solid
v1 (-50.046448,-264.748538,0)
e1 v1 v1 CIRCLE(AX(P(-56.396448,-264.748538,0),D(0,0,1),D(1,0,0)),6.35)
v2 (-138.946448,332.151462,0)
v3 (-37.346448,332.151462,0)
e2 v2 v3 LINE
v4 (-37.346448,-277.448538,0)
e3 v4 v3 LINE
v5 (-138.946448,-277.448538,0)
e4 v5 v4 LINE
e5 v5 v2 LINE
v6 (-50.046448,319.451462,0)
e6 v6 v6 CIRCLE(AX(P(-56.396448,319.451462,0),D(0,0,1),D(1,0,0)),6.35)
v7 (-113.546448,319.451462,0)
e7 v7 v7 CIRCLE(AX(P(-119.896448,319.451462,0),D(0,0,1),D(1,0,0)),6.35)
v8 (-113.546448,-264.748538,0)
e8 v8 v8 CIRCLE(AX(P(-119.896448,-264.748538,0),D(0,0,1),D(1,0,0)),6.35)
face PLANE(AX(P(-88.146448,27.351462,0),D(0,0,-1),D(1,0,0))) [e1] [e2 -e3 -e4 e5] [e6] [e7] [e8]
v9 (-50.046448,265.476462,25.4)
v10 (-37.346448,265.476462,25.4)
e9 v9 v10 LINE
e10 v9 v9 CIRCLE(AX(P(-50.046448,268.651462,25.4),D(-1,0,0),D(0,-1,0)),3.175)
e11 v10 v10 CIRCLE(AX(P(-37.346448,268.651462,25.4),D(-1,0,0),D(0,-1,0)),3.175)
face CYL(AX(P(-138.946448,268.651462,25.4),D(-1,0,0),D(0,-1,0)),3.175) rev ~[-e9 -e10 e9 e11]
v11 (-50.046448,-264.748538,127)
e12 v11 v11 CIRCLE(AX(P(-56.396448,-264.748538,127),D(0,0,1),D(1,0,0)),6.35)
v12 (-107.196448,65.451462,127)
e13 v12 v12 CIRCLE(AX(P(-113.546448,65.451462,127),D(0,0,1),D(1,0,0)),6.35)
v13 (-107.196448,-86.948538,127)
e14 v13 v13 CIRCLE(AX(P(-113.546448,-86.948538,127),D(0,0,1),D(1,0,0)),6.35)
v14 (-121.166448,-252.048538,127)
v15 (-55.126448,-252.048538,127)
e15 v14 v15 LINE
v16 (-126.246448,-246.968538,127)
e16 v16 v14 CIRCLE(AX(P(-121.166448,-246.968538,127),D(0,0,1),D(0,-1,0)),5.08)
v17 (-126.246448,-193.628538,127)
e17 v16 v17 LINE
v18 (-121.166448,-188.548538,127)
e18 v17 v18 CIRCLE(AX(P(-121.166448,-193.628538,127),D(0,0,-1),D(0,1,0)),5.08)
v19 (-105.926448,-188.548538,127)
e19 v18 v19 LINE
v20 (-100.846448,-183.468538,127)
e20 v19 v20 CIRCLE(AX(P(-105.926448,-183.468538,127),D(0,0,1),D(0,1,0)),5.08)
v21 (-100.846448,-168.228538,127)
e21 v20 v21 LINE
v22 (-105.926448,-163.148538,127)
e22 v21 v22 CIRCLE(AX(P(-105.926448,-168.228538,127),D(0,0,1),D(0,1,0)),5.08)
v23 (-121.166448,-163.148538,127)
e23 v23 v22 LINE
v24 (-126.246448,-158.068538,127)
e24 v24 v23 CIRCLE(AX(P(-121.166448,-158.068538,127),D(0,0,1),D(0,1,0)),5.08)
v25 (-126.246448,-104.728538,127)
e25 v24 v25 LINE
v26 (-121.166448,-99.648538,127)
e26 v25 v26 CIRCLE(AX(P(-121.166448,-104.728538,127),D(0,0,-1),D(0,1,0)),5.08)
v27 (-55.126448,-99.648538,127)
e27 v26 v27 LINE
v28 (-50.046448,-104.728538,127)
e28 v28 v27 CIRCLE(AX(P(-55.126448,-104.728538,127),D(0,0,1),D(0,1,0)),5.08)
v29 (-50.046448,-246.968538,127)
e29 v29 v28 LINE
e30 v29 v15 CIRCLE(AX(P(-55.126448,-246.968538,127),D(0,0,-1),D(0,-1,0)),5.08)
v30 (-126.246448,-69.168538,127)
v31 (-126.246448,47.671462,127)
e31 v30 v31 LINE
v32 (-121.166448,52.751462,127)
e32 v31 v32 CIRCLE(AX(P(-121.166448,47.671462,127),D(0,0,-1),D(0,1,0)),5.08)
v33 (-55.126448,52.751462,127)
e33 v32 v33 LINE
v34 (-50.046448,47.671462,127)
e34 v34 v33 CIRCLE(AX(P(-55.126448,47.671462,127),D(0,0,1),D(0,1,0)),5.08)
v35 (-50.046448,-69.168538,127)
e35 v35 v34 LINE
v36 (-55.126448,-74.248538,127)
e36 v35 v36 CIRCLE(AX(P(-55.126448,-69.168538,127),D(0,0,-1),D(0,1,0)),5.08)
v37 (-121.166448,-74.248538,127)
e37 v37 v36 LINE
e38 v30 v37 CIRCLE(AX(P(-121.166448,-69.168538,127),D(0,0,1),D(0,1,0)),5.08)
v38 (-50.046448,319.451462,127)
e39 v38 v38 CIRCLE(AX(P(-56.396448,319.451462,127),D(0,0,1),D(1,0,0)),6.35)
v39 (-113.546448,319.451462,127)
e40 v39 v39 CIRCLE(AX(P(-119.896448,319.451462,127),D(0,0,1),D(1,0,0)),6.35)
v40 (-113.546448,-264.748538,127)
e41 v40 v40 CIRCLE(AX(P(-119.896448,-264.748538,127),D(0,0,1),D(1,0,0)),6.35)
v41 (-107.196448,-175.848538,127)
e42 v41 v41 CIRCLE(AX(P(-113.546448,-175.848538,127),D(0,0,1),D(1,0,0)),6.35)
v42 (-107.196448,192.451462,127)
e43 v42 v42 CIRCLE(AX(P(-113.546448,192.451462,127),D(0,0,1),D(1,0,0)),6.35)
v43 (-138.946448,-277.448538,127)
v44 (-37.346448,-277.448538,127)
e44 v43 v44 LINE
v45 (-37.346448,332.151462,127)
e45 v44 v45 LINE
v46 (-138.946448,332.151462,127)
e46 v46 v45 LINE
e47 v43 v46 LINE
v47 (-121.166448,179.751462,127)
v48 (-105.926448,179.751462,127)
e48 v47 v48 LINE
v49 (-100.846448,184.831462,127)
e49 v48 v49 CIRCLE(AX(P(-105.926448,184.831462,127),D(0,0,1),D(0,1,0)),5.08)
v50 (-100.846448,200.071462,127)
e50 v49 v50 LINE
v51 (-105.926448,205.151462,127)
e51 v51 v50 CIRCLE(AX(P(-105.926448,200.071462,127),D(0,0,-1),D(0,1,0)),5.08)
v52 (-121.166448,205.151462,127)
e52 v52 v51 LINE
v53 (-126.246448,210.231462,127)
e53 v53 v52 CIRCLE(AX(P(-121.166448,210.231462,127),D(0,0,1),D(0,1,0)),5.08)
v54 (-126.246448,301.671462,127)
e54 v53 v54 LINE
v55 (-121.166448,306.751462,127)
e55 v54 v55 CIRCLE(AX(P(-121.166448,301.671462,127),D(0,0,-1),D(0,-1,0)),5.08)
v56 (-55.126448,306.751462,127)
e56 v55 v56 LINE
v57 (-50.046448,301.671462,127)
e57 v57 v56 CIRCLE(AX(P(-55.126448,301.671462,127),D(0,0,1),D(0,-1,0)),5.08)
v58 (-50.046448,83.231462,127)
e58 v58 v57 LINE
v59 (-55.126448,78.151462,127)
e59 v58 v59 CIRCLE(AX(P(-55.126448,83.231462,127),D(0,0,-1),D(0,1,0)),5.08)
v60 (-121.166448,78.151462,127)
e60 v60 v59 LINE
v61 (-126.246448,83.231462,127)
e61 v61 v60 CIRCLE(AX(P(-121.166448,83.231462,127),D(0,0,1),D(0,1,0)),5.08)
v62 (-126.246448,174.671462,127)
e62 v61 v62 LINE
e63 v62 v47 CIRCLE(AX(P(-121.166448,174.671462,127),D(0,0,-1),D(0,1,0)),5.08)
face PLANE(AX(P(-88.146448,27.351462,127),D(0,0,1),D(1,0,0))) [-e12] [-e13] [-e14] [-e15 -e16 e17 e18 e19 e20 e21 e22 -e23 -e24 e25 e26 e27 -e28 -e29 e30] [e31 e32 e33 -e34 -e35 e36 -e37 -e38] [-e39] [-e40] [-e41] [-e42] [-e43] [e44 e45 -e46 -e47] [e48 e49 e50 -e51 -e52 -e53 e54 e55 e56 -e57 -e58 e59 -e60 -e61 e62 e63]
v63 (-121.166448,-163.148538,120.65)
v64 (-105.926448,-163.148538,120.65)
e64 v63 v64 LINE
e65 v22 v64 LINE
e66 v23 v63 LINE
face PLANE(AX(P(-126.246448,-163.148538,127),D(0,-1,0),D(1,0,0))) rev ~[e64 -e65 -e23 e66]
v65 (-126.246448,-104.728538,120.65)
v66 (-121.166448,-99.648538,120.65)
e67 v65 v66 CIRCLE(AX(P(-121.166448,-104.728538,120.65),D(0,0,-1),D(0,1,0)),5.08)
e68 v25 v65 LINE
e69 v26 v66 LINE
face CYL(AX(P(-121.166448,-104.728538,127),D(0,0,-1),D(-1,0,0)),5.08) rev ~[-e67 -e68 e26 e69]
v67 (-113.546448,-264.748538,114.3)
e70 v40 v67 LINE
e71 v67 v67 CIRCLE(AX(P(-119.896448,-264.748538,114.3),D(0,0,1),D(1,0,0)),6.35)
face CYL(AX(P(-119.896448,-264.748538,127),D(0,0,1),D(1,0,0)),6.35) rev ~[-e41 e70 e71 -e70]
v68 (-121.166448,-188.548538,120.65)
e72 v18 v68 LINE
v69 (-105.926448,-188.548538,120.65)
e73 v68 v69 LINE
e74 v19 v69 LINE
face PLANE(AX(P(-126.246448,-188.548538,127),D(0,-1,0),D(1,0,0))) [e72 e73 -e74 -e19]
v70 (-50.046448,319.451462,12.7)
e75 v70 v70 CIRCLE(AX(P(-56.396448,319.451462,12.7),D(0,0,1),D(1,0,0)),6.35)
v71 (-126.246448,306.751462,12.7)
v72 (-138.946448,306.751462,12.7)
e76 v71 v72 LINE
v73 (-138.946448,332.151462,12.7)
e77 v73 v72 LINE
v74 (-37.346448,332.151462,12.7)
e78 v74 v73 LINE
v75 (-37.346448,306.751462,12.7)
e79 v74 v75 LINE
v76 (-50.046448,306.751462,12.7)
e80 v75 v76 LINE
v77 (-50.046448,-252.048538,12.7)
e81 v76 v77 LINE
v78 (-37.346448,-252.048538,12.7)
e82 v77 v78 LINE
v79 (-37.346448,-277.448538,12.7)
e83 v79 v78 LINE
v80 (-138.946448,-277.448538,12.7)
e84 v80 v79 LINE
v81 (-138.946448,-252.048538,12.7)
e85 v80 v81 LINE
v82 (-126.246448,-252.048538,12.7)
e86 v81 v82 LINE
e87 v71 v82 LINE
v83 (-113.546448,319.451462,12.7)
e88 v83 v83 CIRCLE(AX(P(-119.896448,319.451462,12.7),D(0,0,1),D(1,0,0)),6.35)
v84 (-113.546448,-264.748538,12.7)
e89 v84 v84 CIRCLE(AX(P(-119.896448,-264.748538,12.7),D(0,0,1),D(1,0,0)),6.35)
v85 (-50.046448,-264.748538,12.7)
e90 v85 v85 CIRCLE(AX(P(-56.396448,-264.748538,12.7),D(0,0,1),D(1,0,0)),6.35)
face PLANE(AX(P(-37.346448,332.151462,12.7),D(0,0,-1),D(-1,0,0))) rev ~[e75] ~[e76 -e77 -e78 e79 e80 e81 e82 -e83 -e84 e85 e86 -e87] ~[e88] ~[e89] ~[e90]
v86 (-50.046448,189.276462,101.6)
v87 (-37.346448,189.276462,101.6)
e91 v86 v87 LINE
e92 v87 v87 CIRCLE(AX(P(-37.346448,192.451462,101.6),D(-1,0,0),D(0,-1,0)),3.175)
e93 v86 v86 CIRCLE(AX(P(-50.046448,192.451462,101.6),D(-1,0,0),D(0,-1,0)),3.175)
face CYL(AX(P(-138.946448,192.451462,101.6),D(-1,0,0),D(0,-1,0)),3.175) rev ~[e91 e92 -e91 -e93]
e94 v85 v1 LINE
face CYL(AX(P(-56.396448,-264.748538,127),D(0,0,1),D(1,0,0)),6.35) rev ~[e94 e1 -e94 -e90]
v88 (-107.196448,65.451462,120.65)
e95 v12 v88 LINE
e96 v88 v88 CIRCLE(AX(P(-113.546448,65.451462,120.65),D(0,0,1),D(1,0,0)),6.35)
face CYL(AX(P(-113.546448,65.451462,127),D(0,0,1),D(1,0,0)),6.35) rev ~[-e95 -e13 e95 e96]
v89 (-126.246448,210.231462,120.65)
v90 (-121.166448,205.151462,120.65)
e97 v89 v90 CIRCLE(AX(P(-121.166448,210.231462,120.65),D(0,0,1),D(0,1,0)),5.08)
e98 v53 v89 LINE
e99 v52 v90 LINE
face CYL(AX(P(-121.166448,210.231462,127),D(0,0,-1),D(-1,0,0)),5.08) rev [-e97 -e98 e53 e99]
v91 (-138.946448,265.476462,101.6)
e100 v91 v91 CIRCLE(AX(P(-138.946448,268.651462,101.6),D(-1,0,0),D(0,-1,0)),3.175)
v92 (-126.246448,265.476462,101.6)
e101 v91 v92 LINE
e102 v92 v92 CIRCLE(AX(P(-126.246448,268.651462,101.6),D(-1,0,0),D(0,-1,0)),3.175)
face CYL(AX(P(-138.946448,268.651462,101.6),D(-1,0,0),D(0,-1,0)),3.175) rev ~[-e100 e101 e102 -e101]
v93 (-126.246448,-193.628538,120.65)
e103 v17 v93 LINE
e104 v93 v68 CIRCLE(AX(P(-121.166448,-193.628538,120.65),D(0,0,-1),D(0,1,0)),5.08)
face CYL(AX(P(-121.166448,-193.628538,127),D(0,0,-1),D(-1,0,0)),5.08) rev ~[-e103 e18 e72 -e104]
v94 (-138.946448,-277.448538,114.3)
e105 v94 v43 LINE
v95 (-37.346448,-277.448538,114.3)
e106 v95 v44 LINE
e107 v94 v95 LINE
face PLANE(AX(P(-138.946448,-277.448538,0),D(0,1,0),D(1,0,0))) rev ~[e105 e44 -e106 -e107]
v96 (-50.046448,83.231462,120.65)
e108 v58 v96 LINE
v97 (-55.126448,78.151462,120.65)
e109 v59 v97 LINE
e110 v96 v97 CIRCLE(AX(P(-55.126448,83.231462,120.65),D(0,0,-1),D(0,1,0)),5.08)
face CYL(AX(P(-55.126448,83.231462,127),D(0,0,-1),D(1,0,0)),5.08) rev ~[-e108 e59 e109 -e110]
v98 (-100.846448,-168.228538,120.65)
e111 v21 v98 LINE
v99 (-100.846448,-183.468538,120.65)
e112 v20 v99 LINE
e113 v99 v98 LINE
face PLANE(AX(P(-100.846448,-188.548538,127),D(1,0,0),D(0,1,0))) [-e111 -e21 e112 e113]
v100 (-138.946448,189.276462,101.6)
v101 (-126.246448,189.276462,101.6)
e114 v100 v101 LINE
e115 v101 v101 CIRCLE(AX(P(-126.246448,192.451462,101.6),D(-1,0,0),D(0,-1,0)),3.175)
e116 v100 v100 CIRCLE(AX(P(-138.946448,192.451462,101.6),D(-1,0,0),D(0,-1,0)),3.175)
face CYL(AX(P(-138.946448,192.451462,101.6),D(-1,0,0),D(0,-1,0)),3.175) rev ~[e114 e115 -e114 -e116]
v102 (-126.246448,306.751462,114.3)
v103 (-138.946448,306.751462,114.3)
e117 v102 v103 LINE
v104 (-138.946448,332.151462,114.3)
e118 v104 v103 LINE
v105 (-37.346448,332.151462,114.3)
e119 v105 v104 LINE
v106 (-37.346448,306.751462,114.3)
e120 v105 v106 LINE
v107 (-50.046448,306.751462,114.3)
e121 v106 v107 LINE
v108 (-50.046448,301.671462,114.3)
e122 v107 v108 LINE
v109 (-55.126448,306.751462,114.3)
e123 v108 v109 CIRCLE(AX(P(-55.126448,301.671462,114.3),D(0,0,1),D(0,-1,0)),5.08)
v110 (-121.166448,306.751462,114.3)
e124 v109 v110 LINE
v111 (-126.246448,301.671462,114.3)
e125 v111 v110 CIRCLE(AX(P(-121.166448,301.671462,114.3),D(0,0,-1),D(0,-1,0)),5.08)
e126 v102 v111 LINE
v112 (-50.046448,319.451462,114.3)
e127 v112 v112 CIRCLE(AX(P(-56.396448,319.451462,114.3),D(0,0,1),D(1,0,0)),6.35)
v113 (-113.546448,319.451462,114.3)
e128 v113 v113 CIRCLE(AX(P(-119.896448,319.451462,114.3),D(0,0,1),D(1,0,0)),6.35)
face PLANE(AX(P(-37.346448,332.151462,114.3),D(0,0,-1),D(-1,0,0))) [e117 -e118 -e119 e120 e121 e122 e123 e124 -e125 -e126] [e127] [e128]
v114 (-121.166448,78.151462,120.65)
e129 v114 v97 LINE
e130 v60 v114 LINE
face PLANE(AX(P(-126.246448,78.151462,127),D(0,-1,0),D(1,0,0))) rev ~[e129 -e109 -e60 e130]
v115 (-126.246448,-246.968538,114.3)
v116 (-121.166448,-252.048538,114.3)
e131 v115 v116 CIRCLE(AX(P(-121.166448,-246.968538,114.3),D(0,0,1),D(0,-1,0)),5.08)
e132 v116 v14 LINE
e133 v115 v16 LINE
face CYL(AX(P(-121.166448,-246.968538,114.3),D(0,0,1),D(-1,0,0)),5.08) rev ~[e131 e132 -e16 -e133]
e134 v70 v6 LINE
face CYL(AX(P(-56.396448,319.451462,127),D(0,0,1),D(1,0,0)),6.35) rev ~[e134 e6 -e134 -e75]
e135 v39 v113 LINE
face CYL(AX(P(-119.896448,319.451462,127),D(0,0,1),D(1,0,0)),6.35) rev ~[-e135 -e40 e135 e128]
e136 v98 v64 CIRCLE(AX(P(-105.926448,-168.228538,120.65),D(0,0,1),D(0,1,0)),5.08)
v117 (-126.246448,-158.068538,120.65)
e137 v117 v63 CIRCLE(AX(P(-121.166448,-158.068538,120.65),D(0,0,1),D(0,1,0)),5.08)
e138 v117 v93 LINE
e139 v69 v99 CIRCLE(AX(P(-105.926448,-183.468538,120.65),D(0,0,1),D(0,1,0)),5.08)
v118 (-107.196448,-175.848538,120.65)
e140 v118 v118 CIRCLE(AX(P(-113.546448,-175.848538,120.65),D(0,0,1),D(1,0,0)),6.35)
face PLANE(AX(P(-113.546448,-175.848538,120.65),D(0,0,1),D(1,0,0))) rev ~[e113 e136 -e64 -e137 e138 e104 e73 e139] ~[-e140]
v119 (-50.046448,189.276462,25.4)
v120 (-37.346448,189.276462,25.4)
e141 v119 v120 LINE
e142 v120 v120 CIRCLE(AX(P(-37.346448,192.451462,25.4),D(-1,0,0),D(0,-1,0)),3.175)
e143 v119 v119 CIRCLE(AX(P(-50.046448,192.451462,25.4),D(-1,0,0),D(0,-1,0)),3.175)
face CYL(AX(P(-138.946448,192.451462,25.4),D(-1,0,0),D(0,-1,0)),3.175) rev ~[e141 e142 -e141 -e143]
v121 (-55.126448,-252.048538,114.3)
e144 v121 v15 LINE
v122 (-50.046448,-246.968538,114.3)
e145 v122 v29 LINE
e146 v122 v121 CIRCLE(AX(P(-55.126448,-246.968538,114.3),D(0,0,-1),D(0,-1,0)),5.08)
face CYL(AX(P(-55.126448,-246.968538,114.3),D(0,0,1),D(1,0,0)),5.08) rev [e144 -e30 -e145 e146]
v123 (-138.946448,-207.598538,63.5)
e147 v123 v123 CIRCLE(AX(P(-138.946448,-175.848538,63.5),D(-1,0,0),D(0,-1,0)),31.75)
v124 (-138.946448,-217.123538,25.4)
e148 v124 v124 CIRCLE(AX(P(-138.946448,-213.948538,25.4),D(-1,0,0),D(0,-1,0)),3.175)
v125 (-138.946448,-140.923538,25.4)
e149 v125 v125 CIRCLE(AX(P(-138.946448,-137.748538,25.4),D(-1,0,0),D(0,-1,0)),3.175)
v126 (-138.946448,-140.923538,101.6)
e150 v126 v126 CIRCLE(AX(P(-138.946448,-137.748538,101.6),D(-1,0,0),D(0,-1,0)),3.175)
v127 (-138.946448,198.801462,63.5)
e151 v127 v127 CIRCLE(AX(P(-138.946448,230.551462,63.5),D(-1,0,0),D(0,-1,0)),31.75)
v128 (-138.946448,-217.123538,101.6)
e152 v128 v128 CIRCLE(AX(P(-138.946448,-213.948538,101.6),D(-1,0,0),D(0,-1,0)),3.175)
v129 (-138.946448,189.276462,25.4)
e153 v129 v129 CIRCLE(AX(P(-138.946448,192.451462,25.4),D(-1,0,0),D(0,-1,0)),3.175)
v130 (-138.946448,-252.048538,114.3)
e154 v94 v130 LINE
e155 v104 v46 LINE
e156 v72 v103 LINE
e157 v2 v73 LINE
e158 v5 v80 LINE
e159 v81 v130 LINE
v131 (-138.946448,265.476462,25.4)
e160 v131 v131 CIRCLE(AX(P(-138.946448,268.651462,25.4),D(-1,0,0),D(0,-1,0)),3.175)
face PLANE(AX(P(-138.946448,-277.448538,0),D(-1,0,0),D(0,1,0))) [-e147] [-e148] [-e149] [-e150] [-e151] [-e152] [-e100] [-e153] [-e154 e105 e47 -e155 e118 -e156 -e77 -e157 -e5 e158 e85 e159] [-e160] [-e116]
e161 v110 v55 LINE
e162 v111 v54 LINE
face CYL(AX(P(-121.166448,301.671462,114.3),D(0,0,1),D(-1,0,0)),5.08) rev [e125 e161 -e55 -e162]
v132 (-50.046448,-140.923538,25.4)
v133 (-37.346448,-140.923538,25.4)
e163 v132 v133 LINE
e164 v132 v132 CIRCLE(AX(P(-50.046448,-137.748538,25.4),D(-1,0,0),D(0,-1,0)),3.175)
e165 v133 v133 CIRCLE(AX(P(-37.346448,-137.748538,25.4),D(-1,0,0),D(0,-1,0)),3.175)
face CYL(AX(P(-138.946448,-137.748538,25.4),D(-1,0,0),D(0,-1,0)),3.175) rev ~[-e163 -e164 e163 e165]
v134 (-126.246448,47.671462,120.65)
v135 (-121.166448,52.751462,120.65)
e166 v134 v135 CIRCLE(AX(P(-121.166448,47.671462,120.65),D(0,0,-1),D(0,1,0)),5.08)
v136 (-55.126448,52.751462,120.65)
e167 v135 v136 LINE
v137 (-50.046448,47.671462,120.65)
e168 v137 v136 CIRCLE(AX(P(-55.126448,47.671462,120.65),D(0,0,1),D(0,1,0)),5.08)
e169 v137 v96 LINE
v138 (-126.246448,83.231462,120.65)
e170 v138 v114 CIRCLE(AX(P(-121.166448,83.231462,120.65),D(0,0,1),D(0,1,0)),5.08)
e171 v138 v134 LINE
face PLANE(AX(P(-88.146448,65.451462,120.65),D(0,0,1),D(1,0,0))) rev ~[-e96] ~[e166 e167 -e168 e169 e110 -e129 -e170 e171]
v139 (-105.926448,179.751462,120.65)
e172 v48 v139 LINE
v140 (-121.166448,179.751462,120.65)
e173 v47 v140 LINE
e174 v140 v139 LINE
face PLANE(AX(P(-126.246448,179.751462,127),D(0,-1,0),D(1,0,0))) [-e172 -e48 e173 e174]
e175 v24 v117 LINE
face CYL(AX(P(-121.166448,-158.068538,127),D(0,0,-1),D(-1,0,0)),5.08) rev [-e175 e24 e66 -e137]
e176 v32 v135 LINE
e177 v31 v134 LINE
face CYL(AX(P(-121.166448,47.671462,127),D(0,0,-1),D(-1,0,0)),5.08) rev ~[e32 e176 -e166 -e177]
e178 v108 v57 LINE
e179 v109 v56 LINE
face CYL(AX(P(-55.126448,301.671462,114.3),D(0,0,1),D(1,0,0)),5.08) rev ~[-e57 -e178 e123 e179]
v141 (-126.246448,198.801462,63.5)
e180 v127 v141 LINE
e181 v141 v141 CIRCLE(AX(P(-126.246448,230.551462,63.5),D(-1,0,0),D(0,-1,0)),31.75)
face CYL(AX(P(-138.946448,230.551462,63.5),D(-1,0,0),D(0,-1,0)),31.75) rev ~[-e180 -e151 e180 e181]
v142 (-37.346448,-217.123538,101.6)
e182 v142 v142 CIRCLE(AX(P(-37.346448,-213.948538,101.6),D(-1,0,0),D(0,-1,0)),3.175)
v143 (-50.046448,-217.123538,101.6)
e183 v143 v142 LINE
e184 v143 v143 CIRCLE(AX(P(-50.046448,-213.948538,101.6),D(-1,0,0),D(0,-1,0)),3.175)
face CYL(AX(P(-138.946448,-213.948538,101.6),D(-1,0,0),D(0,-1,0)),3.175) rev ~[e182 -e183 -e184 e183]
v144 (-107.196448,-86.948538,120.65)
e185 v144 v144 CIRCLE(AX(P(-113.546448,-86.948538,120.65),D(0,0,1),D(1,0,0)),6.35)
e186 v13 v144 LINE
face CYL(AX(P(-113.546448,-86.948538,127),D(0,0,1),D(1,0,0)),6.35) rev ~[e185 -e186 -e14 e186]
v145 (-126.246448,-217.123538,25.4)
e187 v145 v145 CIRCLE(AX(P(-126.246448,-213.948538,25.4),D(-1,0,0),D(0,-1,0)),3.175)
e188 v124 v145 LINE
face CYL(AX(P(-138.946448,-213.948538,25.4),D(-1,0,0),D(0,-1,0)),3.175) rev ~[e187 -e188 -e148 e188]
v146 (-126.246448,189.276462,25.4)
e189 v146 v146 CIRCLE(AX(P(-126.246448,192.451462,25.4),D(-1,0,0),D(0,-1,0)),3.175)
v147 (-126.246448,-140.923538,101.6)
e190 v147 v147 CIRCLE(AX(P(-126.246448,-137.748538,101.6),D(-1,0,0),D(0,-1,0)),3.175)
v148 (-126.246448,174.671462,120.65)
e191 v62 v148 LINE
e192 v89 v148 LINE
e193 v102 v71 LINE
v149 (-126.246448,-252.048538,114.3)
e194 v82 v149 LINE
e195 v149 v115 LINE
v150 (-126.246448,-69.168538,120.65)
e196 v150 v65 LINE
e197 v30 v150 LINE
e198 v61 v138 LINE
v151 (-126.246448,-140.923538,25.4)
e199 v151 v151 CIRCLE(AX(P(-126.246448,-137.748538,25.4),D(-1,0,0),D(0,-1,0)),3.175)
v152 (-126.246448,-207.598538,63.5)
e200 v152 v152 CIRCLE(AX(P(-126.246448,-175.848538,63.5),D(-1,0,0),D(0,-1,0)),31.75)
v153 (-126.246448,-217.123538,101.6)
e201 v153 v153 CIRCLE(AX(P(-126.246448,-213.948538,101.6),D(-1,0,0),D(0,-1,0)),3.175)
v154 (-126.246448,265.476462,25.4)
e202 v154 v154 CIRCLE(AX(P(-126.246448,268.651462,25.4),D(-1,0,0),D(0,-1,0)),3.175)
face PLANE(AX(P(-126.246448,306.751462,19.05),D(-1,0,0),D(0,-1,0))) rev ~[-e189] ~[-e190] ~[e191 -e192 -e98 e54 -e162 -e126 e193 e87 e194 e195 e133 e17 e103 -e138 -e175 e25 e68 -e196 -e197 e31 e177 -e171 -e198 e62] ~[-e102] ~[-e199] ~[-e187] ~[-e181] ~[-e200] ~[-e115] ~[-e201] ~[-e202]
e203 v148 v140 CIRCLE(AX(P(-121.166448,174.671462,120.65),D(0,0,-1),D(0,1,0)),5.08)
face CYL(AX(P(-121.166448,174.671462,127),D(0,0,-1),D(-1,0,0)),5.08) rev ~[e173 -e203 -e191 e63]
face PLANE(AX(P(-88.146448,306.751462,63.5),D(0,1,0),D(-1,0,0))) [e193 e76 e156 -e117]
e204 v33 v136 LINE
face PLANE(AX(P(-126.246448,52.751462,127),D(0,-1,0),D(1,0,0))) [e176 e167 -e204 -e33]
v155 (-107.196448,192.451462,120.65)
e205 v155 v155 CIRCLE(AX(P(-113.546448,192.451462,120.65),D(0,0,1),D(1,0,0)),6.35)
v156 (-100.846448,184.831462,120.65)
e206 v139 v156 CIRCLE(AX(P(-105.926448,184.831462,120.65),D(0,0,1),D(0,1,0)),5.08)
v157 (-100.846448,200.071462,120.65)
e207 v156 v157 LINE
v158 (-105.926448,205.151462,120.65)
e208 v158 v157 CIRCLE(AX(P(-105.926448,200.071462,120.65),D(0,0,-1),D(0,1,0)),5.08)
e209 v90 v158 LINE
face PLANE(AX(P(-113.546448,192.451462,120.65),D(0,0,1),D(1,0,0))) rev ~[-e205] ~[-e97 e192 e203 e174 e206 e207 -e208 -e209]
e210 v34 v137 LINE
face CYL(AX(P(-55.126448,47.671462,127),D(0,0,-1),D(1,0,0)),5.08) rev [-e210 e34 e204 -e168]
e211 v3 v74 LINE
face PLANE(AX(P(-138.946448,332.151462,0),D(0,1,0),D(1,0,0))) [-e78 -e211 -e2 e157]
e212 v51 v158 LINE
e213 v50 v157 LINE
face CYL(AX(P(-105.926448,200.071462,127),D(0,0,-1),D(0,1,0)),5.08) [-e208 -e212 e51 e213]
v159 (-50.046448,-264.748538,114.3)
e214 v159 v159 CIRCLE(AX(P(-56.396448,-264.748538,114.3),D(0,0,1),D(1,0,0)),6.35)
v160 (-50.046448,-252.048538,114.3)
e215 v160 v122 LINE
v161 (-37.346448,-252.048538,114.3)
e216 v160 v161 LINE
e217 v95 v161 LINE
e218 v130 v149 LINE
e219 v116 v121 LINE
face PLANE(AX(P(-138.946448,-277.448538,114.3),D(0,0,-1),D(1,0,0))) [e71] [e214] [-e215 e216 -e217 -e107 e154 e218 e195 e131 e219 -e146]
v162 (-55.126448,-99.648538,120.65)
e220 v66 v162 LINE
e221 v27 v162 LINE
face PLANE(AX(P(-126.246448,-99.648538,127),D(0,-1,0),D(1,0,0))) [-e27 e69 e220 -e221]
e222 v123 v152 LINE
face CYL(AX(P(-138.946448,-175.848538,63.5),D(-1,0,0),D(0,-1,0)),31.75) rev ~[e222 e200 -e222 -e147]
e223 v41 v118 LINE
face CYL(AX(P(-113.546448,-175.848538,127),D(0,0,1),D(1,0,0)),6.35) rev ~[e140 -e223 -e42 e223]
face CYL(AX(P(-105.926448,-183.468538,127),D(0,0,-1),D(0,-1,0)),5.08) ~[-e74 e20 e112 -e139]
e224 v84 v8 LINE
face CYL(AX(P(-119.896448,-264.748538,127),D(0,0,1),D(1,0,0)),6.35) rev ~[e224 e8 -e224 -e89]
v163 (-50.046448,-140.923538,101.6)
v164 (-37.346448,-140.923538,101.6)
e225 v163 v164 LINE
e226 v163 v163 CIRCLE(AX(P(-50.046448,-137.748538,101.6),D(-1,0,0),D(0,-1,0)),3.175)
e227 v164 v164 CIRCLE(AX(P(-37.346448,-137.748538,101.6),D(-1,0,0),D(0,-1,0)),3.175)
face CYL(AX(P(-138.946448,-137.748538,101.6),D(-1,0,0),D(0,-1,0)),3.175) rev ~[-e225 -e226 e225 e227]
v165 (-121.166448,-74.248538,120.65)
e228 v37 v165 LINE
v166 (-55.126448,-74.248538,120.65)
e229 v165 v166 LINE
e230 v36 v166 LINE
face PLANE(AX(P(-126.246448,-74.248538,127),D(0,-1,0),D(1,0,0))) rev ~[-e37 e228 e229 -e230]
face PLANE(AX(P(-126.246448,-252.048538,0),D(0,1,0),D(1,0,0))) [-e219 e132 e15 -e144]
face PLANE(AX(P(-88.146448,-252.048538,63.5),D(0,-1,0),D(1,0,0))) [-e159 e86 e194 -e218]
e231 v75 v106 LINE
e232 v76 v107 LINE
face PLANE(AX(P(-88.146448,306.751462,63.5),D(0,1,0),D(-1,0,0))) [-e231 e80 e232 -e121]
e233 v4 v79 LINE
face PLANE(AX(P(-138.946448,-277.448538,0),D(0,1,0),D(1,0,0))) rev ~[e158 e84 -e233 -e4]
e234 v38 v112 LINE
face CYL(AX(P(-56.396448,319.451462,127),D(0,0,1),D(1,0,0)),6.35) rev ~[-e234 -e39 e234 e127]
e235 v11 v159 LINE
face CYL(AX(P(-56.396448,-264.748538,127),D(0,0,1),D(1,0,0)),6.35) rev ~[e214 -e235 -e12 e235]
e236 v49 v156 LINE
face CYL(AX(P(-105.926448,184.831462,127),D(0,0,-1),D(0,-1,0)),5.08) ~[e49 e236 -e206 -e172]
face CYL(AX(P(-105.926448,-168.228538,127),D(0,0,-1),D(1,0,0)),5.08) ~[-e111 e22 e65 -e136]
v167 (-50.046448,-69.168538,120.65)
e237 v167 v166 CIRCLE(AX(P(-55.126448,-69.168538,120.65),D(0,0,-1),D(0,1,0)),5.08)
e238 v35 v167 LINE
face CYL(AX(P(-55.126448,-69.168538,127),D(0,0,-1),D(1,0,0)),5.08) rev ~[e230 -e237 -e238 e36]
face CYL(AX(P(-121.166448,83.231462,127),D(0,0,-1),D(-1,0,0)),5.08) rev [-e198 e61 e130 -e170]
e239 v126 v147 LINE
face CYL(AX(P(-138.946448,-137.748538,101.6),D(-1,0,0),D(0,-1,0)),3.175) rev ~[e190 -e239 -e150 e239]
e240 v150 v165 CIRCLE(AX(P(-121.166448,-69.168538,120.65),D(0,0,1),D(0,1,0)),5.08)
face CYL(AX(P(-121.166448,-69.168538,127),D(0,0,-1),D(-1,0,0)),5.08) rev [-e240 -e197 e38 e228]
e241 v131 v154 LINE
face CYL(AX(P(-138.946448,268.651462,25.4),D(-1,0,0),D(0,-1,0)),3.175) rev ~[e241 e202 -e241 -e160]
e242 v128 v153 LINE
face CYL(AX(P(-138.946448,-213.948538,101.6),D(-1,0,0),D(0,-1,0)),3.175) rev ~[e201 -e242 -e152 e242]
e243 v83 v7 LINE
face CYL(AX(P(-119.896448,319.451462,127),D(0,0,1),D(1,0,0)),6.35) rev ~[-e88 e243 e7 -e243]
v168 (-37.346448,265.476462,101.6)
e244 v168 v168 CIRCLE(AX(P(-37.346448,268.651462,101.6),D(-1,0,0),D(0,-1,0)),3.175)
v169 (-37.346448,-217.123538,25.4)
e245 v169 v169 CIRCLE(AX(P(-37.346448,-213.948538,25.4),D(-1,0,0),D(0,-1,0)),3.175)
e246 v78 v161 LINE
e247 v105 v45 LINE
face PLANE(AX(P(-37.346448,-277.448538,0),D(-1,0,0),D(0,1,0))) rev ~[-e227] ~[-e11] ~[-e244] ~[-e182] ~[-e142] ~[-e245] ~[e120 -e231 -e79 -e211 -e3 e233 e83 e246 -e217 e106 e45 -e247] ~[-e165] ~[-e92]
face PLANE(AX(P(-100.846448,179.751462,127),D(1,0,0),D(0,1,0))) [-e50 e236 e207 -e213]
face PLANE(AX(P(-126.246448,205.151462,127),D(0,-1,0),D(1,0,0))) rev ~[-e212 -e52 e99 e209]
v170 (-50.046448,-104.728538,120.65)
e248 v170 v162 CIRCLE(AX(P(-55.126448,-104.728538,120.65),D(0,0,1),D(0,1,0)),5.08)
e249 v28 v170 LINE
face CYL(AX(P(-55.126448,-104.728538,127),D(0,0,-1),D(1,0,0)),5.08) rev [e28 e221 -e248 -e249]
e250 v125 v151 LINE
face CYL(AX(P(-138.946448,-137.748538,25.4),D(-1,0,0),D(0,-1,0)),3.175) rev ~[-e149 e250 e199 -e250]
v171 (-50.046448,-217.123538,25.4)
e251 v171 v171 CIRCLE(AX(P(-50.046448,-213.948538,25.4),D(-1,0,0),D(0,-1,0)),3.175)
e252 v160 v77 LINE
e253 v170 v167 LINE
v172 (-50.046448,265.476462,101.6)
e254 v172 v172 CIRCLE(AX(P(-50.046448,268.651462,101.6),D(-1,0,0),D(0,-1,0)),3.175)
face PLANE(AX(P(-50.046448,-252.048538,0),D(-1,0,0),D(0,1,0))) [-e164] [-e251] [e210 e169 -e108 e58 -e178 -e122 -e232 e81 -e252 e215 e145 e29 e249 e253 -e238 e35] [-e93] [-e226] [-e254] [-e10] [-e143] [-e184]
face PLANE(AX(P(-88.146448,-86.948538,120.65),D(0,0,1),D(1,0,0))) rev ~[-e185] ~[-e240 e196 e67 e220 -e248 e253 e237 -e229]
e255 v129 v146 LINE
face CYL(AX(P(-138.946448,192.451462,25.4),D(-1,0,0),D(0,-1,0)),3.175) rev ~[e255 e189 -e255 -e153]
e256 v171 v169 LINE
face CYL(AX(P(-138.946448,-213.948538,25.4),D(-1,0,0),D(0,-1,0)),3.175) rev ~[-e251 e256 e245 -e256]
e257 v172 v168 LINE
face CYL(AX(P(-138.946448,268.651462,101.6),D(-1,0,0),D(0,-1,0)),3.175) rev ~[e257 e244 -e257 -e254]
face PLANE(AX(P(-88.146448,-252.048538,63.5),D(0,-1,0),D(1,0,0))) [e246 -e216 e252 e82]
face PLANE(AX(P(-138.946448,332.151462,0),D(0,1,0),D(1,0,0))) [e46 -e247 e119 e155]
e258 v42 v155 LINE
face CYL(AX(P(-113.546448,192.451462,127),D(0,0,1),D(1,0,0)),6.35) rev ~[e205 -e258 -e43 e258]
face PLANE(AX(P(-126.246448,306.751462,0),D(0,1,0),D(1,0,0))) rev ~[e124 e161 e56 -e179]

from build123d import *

# Parameters (mm, degrees)
F0_W      = 101.6
F0_H      = 609.6
F0_W_2    = 76.2
F0_H_2    = 558.8
F1_DEPTH  = 127
F2_W      = 76.2
F2_H      = 558.8
F3_DEPTH  = 19.05
F4_W      = 76.2
F4_H      = 25.4
F5_DEPTH  = 6.35
F6_W      = 101.6
F6_H      = 101.6
F7_DEPTH  = 25.4
F8_W      = 101.6
F8_H      = 101.6
F9_DEPTH  = 25.4
F10_DEPTH = 6.35
F11_R     = 6.35
F12_DEPTH = 6.35
F13_R     = 6.35
F14_DEPTH = 12.7
F15_DEPTH = 127
F16_W     = 25.4
F16_H     = 25.4
F17_DEPTH = 6.35
F18_R     = 6.35
F19_DEPTH = 6.35
F20_R     = 5.08
F21_R     = 31.75
F22_DEPTH = 12.7
F23_R     = 3.175
F24_DEPTH = 101.6


with BuildPart() as f1:
    # F0 (on Top) → F1 (new body)
    with BuildSketch(Plane.XY):
        with Locations((-88.1464483801, 27.3514616579)):
            Rectangle(F0_W, F0_H)
        with Locations((-88.1464483801, 27.3514616579)):
            Rectangle(F0_W_2, F0_H_2, mode=Mode.SUBTRACT)
    extrude(amount=F1_DEPTH)

    # F2 (on face) → F3 (join)
    with BuildSketch(Plane(origin=(0, 0, 0), x_dir=(1, 0, 0), z_dir=(0, 0, -1))):
        with Locations((-88.1464483801, -27.3514616579)):
            Rectangle(F2_W, F2_H)
    extrude(amount=-F3_DEPTH)

    # F4 (on face) → F5 (join)
    with BuildSketch(Plane.XY.offset(127)):
        with Locations((-88.1464483801, 65.4514616579)):
            Rectangle(F4_W, F4_H)
        with Locations((-88.1464483801, -86.9485383421)):
            Rectangle(F4_W, F4_H)
    extrude(amount=-F5_DEPTH)

    # F6 (on face) → F7 (cut)
    with BuildSketch(Plane.XZ.offset(277.4485383421)):
        with Locations((-88.1464483801, 63.5)):
            Rectangle(F6_W, F6_H)
    extrude(amount=-F7_DEPTH, mode=Mode.SUBTRACT)

    # F8 (on face) → F9 (cut)
    with BuildSketch(Plane(origin=(0, 332.1514616579, 0), x_dir=(-1, 0, 0), z_dir=(0, 1, 0))):
        with Locations((88.1464483801, 63.5)):
            Rectangle(F8_W, F8_H)
    extrude(amount=-F9_DEPTH, mode=Mode.SUBTRACT)

    # F10 (cut): a face of the model
    f10_faces = [f1.faces().sort_by_distance(p)[0] for p in [
        (-88.1464483801, 27.3514616579, 19.05),
    ]]
    extrude(f10_faces, amount=-F10_DEPTH, mode=Mode.SUBTRACT)

    # F11 (on face) → F12 (cut)
    with BuildSketch(Plane.XY.offset(127)):
        with Locations((-113.5464483801, 65.4514616579)):
            Circle(F11_R)
        with Locations((-113.5464483801, -86.9485383421)):
            Circle(F11_R)
    extrude(amount=-F12_DEPTH, mode=Mode.SUBTRACT)

    # F13 (on face) → F14 (cut)
    with BuildSketch(Plane.XY.offset(127)):
        with Locations((-119.8964483801, -264.7485383421)):
            Circle(F13_R)
        with Locations((-56.3964483801, -264.7485383421)):
            Circle(F13_R)
        with Locations((-119.8964483801, 319.4514616579)):
            Circle(F13_R)
        with Locations((-56.3964483801, 319.4514616579)):
            Circle(F13_R)
    extrude(amount=-F14_DEPTH, mode=Mode.SUBTRACT)

    # F13 (on face) → F15 (cut)
    with BuildSketch(Plane.XY.offset(127)):
        with Locations((-119.8964483801, 319.4514616579)):
            Circle(F13_R)
        with Locations((-56.3964483801, 319.4514616579)):
            Circle(F13_R)
        with Locations((-119.8964483801, -264.7485383421)):
            Circle(F13_R)
        with Locations((-56.3964483801, -264.7485383421)):
            Circle(F13_R)
    extrude(amount=-F15_DEPTH, mode=Mode.SUBTRACT)

    # F16 (on face) → F17 (join)
    with BuildSketch(Plane.XY.offset(127)):
        with Locations((-113.5464483801, -175.8485383421)):
            Rectangle(F16_W, F16_H)
        with Locations((-113.5464483801, 192.4514616579)):
            Rectangle(F16_W, F16_H)
    extrude(amount=-F17_DEPTH)

    # F18 (on face) → F19 (cut)
    with BuildSketch(Plane.XY.offset(127)):
        with Locations((-113.5464483801, 192.4514616579)):
            Circle(F18_R)
        with Locations((-113.5464483801, -175.8485383421)):
            Circle(F18_R)
    extrude(amount=-F19_DEPTH, mode=Mode.SUBTRACT)

    # F20
    f20_edges = [f1.edges().sort_by_distance(p)[0] for p in [
        (-126.246448, -99.648538, 123.825),
        (-50.046448, -99.648538, 123.825),
        (-100.846448, -163.148538, 123.825),
        (-100.846448, -188.548538, 123.825),
        (-126.246448, -188.548538, 123.825),
        (-126.246448, -163.148538, 123.825),
        (-50.046448, -252.048538, 120.65),
        (-50.046448, -74.248538, 123.825),
        (-126.246448, -74.248538, 123.825),
        (-50.046448, 52.751462, 123.825),
        (-126.246448, 52.751462, 123.825),
        (-126.246448, 179.751462, 123.825),
        (-126.246448, 78.151462, 123.825),
        (-50.046448, 78.151462, 123.825),
        (-100.846448, 179.751462, 123.825),
        (-126.246448, 205.151462, 123.825),
        (-100.846448, 205.151462, 123.825),
        (-126.246448, 306.751462, 120.65),
        (-126.246448, -252.048538, 120.65),
        (-50.046448, 306.751462, 120.65),
    ]]
    fillet(f20_edges, radius=F20_R)

    # F21 (on face) → F22 (cut)
    with BuildSketch(Plane(origin=(-138.9464483801, 0, 0), x_dir=(0, -1, 0), z_dir=(-1, 0, 0))):
        with Locations((-230.5514616579, 63.5)):
            Circle(F21_R)
        with Locations((175.8485383421, 63.5)):
            Circle(F21_R)
    extrude(amount=-F22_DEPTH, mode=Mode.SUBTRACT)

    # F23 (on face) → F24 (cut)
    with BuildSketch(Plane(origin=(-138.9464483801, 0, 0), x_dir=(0, -1, 0), z_dir=(-1, 0, 0))):
        with Locations((137.7485383421, 101.6)):
            Circle(F23_R)
        with Locations((137.7485383421, 25.4)):
            Circle(F23_R)
        with Locations((213.9485383421, 25.4)):
            Circle(F23_R)
        with Locations((213.9485383421, 101.6)):
            Circle(F23_R)
        with Locations((-192.4514616579, 25.4)):
            Circle(F23_R)
        with Locations((-268.6514616579, 25.4)):
            Circle(F23_R)
        with Locations((-268.6514616579, 101.6)):
            Circle(F23_R)
        with Locations((-192.4514616579, 101.6)):
            Circle(F23_R)
    extrude(amount=-F24_DEPTH, mode=Mode.SUBTRACT)


solid = f1.part
